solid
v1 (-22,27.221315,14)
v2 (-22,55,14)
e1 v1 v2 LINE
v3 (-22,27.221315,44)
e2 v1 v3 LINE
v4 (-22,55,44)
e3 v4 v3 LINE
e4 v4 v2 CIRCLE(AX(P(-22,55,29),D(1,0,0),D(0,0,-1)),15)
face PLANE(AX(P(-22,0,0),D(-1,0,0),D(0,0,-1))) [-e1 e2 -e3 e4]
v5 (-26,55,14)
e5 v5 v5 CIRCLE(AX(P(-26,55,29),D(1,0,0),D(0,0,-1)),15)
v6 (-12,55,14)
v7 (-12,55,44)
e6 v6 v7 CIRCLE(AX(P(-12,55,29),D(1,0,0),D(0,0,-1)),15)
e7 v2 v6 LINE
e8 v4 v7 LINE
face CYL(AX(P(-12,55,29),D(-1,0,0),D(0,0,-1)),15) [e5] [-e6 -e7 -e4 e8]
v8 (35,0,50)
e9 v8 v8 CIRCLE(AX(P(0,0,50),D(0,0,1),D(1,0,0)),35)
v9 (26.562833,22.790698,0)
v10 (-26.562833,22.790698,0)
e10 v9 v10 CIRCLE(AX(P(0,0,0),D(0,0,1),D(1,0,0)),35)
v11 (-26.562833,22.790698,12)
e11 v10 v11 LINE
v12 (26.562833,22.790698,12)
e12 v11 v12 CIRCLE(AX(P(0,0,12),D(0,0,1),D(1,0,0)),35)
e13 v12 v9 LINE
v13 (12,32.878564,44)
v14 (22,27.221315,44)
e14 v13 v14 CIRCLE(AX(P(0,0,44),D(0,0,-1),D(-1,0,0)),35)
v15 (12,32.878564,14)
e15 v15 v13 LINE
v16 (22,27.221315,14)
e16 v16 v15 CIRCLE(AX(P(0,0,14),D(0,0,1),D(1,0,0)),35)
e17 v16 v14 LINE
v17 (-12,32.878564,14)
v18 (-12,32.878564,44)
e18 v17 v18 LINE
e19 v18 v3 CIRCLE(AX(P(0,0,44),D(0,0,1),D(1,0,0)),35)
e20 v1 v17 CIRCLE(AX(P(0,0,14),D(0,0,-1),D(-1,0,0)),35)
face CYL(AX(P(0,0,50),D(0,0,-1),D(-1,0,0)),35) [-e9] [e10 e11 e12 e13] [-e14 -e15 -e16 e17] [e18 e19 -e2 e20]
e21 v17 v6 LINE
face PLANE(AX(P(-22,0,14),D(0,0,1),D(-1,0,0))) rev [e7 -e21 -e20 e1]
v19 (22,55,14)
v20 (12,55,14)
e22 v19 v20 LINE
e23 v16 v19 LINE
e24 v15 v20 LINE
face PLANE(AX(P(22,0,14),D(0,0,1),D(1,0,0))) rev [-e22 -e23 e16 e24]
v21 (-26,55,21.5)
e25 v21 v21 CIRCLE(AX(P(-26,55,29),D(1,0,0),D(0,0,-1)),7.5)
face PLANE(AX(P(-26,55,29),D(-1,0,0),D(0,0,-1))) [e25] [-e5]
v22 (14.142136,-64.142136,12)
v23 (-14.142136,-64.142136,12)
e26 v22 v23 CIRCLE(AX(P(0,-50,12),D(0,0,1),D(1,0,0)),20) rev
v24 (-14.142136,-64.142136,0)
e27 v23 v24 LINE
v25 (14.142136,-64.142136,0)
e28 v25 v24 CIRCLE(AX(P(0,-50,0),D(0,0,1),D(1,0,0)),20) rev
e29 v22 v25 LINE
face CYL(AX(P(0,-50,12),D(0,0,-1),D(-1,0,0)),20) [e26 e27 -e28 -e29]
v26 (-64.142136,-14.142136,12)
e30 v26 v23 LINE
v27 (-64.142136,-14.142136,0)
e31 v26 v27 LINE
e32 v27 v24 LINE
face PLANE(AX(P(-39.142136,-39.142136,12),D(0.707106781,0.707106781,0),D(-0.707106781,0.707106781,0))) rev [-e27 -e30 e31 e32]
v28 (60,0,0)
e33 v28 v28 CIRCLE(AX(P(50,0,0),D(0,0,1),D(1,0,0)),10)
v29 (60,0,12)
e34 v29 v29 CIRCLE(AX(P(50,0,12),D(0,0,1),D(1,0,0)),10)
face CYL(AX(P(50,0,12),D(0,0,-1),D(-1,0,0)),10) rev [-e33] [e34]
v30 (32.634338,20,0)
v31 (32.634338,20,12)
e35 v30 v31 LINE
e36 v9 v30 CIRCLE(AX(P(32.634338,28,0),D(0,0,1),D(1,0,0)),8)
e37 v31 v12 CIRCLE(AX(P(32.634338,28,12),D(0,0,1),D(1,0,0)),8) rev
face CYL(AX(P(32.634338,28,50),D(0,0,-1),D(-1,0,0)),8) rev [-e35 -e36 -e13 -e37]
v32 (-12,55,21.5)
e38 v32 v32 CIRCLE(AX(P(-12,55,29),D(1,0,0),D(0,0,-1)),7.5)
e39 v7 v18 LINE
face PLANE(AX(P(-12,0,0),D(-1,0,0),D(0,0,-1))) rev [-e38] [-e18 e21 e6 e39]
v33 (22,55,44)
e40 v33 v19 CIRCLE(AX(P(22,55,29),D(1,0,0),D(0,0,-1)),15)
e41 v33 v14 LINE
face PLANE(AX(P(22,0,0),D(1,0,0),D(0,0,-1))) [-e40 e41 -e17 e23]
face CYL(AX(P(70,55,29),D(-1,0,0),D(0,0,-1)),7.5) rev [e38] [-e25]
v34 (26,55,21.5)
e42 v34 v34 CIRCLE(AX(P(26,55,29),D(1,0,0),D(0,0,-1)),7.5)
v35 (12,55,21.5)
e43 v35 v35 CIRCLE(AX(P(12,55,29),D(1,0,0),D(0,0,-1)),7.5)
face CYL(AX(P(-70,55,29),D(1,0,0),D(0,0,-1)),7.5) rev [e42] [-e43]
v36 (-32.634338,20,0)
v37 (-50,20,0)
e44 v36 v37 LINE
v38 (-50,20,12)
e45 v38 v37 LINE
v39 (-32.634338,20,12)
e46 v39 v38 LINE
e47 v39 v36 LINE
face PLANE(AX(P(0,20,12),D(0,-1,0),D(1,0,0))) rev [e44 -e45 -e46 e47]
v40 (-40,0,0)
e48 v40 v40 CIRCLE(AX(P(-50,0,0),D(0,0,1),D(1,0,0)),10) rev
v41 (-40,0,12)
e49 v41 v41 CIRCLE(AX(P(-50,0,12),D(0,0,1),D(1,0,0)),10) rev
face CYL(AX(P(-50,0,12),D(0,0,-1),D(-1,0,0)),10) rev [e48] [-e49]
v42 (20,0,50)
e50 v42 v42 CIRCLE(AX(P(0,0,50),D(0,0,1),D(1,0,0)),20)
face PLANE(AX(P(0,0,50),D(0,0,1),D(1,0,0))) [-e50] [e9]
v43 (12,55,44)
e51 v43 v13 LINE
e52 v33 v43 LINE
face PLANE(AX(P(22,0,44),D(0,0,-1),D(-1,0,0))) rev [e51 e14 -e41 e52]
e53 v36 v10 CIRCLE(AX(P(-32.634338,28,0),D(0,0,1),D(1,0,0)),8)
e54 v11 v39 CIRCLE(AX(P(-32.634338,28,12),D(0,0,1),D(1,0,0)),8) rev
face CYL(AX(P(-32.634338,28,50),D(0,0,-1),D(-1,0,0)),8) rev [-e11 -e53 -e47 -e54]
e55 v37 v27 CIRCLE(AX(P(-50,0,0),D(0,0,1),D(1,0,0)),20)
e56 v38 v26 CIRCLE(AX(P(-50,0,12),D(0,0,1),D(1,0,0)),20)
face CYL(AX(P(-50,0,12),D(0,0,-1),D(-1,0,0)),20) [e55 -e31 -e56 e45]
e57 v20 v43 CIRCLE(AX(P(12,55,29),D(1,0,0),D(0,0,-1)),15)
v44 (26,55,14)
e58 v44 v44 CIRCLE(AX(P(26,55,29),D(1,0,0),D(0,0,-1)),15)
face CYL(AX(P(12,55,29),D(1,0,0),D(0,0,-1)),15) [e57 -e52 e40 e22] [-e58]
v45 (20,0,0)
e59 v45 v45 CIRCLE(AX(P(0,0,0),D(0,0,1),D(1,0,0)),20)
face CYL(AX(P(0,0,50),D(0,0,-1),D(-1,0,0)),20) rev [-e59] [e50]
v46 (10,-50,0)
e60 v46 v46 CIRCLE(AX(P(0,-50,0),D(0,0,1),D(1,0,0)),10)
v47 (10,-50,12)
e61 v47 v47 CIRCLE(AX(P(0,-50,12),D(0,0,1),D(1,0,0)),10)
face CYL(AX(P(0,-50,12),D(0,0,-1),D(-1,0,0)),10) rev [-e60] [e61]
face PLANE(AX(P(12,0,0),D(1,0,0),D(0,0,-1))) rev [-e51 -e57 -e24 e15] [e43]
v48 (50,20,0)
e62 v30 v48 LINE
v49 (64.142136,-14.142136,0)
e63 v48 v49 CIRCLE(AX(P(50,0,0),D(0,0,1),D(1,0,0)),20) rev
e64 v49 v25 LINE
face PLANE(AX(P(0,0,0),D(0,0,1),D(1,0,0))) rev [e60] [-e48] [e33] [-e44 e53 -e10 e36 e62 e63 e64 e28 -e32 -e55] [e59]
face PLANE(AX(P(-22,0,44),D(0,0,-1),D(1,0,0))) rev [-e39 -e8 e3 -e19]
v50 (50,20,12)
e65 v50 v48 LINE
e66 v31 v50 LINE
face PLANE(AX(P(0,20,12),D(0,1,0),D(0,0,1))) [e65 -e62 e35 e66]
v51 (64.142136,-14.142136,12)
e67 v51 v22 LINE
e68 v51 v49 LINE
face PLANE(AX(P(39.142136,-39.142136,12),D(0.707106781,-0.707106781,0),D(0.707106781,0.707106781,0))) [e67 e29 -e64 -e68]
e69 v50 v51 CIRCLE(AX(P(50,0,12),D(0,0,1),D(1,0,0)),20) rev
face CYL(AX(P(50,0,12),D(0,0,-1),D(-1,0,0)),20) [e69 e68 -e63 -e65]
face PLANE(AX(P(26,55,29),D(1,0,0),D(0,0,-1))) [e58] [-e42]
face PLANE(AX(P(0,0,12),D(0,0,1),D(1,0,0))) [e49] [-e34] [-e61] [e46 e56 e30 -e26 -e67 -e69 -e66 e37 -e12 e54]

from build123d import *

# Parameters (mm, degrees)
SKETCH1_R                = 10
BOSS_EXTRUDE1_DEPTH      = 12
SKETCH1_3_R              = 35
SKETCH1_3_R_2            = 20
BOSS_EXTRUDE2_DEPTH      = 50
BOSS_EXTRUDE3_START      = 12
BOSS_EXTRUDE3_DEPTH      = 10
BOSS_EXTRUDE4_DEPTH      = 4
BOSS_EXTRUDE4_DEPTH_BACK = 10
SKETCH5_R                = 15
SKETCH6_R                = 7.5
CUT_EXTRUDE1_DEPTH       = 129.903064355
FILLET1_R                = 8


with BuildPart() as part:
    # Sketch1 → Boss-Extrude1 (new body)
    with BuildSketch(Plane.XY):
        with BuildLine():
            Line((50, 20), (28.722813233, 20))
            ThreePointArc((28.722813233, 20), (33.393850206, 10.480971731), (35, 0))
            ThreePointArc((35, 0), (-10.480971731, -33.393850206), (-28.722813233, 20))
            Line((-28.722813233, 20), (-50, 20))
            ThreePointArc((-50, 20), (-68.47759065, 7.653668647), (-64.142135624, -14.142135624))
            Line((-64.142135624, -14.142135624), (-14.142135624, -64.142135624))
            ThreePointArc((-14.142135624, -64.142135624), (0, -70), (14.142135624, -64.142135624))
            Line((14.142135624, -64.142135624), (64.142135624, -14.142135624))
            ThreePointArc((64.142135624, -14.142135624), (68.47759065, 7.653668647), (50, 20))
        make_face()
        with Locations((0, -50)):
            Circle(SKETCH1_R, mode=Mode.SUBTRACT)
        with Locations((-50, 0)):
            Circle(SKETCH1_R, mode=Mode.SUBTRACT)
        with Locations((50, 0)):
            Circle(SKETCH1_R, mode=Mode.SUBTRACT)
    extrude(amount=BOSS_EXTRUDE1_DEPTH)

    # Sketch1<3> → Boss-Extrude2 (add)
    with BuildSketch(Plane.XY):
        with Locations(Location((0, 0, 0), (0, 0, 145.150095421))):
            Circle(SKETCH1_3_R)
        Circle(SKETCH1_3_R_2, mode=Mode.SUBTRACT)
    extrude(amount=BOSS_EXTRUDE2_DEPTH)

    # Sketch4 → Boss-Extrude3 (add)
    with BuildSketch(Plane(origin=(0, 0, 0), x_dir=(0, 0, -1), z_dir=(1, 0, 0)).offset(BOSS_EXTRUDE3_START)):
        Polygon((-14, 55), (-44, 55), (-44, 35), (-44, 20), (-14, 20), align=None)
    extrude(amount=BOSS_EXTRUDE3_DEPTH)

    # Sketch5 → Boss-Extrude4 (add, two sides: drawn at the far end of the back side and taken through both)
    with BuildSketch(Plane(origin=(22, 0, 0), x_dir=(0, 0, -1), z_dir=(1, 0, 0)).offset(-BOSS_EXTRUDE4_DEPTH_BACK)):
        with Locations((-29, 55)):
            Circle(SKETCH5_R)
    extrude(amount=BOSS_EXTRUDE4_DEPTH + BOSS_EXTRUDE4_DEPTH_BACK)

    # Sketch6 → Cut-Extrude1 (cut, through all)
    with BuildSketch(Plane(origin=(26, 0, 0), x_dir=(0, 0, -1), z_dir=(1, 0, 0))):
        with Locations((-29, 55)):
            Circle(SKETCH6_R)
    extrude(amount=-CUT_EXTRUDE1_DEPTH, mode=Mode.SUBTRACT)

    # Mirror1: part across plane


with BuildPart() as part_1:
    add(part.part)
    add(part.part.mirror(Plane(origin=(0, 0, 0), x_dir=(0, 0, 1), z_dir=(1, 0, 0))))

    # Fillet1
    # the kernel refuses this fillet: 8 mm, written as the material it adds along each edge
    with BuildSketch(Plane(origin=(-28.722813233, 20, 0), x_dir=(-1, 0, 0), z_dir=(0, 0, 1))) as fillet1_piece_1:
        with BuildLine():
            CenterArc((3.911524511, -8), FILLET1_R, 90, 49.370671217)
            ThreePointArc((-2.159980185, -2.790697674), (-1.044795429, -1.422589257), (0, 0))
            Line((0, 0), (3.911524511, 0))
        make_face()
    extrude(amount=12)
    with BuildSketch(Plane(origin=(28.722813233, 20, 0), x_dir=(-0.6120739787659375, 0.7908005086731007, 0), z_dir=(0, 0, 1))) as fillet1_piece_2:
        with BuildLine():
            CenterArc((3.932261699, -7.989827403), FILLET1_R, 92.889712102, 49.370671217)
            Line((-2.394142371, -3.093235573), (0, 0))
            ThreePointArc((0, 0), (1.764476403, -0.04450511), (3.528952806, 0))
        make_face()
    extrude(amount=12)


solid = part_1.part
